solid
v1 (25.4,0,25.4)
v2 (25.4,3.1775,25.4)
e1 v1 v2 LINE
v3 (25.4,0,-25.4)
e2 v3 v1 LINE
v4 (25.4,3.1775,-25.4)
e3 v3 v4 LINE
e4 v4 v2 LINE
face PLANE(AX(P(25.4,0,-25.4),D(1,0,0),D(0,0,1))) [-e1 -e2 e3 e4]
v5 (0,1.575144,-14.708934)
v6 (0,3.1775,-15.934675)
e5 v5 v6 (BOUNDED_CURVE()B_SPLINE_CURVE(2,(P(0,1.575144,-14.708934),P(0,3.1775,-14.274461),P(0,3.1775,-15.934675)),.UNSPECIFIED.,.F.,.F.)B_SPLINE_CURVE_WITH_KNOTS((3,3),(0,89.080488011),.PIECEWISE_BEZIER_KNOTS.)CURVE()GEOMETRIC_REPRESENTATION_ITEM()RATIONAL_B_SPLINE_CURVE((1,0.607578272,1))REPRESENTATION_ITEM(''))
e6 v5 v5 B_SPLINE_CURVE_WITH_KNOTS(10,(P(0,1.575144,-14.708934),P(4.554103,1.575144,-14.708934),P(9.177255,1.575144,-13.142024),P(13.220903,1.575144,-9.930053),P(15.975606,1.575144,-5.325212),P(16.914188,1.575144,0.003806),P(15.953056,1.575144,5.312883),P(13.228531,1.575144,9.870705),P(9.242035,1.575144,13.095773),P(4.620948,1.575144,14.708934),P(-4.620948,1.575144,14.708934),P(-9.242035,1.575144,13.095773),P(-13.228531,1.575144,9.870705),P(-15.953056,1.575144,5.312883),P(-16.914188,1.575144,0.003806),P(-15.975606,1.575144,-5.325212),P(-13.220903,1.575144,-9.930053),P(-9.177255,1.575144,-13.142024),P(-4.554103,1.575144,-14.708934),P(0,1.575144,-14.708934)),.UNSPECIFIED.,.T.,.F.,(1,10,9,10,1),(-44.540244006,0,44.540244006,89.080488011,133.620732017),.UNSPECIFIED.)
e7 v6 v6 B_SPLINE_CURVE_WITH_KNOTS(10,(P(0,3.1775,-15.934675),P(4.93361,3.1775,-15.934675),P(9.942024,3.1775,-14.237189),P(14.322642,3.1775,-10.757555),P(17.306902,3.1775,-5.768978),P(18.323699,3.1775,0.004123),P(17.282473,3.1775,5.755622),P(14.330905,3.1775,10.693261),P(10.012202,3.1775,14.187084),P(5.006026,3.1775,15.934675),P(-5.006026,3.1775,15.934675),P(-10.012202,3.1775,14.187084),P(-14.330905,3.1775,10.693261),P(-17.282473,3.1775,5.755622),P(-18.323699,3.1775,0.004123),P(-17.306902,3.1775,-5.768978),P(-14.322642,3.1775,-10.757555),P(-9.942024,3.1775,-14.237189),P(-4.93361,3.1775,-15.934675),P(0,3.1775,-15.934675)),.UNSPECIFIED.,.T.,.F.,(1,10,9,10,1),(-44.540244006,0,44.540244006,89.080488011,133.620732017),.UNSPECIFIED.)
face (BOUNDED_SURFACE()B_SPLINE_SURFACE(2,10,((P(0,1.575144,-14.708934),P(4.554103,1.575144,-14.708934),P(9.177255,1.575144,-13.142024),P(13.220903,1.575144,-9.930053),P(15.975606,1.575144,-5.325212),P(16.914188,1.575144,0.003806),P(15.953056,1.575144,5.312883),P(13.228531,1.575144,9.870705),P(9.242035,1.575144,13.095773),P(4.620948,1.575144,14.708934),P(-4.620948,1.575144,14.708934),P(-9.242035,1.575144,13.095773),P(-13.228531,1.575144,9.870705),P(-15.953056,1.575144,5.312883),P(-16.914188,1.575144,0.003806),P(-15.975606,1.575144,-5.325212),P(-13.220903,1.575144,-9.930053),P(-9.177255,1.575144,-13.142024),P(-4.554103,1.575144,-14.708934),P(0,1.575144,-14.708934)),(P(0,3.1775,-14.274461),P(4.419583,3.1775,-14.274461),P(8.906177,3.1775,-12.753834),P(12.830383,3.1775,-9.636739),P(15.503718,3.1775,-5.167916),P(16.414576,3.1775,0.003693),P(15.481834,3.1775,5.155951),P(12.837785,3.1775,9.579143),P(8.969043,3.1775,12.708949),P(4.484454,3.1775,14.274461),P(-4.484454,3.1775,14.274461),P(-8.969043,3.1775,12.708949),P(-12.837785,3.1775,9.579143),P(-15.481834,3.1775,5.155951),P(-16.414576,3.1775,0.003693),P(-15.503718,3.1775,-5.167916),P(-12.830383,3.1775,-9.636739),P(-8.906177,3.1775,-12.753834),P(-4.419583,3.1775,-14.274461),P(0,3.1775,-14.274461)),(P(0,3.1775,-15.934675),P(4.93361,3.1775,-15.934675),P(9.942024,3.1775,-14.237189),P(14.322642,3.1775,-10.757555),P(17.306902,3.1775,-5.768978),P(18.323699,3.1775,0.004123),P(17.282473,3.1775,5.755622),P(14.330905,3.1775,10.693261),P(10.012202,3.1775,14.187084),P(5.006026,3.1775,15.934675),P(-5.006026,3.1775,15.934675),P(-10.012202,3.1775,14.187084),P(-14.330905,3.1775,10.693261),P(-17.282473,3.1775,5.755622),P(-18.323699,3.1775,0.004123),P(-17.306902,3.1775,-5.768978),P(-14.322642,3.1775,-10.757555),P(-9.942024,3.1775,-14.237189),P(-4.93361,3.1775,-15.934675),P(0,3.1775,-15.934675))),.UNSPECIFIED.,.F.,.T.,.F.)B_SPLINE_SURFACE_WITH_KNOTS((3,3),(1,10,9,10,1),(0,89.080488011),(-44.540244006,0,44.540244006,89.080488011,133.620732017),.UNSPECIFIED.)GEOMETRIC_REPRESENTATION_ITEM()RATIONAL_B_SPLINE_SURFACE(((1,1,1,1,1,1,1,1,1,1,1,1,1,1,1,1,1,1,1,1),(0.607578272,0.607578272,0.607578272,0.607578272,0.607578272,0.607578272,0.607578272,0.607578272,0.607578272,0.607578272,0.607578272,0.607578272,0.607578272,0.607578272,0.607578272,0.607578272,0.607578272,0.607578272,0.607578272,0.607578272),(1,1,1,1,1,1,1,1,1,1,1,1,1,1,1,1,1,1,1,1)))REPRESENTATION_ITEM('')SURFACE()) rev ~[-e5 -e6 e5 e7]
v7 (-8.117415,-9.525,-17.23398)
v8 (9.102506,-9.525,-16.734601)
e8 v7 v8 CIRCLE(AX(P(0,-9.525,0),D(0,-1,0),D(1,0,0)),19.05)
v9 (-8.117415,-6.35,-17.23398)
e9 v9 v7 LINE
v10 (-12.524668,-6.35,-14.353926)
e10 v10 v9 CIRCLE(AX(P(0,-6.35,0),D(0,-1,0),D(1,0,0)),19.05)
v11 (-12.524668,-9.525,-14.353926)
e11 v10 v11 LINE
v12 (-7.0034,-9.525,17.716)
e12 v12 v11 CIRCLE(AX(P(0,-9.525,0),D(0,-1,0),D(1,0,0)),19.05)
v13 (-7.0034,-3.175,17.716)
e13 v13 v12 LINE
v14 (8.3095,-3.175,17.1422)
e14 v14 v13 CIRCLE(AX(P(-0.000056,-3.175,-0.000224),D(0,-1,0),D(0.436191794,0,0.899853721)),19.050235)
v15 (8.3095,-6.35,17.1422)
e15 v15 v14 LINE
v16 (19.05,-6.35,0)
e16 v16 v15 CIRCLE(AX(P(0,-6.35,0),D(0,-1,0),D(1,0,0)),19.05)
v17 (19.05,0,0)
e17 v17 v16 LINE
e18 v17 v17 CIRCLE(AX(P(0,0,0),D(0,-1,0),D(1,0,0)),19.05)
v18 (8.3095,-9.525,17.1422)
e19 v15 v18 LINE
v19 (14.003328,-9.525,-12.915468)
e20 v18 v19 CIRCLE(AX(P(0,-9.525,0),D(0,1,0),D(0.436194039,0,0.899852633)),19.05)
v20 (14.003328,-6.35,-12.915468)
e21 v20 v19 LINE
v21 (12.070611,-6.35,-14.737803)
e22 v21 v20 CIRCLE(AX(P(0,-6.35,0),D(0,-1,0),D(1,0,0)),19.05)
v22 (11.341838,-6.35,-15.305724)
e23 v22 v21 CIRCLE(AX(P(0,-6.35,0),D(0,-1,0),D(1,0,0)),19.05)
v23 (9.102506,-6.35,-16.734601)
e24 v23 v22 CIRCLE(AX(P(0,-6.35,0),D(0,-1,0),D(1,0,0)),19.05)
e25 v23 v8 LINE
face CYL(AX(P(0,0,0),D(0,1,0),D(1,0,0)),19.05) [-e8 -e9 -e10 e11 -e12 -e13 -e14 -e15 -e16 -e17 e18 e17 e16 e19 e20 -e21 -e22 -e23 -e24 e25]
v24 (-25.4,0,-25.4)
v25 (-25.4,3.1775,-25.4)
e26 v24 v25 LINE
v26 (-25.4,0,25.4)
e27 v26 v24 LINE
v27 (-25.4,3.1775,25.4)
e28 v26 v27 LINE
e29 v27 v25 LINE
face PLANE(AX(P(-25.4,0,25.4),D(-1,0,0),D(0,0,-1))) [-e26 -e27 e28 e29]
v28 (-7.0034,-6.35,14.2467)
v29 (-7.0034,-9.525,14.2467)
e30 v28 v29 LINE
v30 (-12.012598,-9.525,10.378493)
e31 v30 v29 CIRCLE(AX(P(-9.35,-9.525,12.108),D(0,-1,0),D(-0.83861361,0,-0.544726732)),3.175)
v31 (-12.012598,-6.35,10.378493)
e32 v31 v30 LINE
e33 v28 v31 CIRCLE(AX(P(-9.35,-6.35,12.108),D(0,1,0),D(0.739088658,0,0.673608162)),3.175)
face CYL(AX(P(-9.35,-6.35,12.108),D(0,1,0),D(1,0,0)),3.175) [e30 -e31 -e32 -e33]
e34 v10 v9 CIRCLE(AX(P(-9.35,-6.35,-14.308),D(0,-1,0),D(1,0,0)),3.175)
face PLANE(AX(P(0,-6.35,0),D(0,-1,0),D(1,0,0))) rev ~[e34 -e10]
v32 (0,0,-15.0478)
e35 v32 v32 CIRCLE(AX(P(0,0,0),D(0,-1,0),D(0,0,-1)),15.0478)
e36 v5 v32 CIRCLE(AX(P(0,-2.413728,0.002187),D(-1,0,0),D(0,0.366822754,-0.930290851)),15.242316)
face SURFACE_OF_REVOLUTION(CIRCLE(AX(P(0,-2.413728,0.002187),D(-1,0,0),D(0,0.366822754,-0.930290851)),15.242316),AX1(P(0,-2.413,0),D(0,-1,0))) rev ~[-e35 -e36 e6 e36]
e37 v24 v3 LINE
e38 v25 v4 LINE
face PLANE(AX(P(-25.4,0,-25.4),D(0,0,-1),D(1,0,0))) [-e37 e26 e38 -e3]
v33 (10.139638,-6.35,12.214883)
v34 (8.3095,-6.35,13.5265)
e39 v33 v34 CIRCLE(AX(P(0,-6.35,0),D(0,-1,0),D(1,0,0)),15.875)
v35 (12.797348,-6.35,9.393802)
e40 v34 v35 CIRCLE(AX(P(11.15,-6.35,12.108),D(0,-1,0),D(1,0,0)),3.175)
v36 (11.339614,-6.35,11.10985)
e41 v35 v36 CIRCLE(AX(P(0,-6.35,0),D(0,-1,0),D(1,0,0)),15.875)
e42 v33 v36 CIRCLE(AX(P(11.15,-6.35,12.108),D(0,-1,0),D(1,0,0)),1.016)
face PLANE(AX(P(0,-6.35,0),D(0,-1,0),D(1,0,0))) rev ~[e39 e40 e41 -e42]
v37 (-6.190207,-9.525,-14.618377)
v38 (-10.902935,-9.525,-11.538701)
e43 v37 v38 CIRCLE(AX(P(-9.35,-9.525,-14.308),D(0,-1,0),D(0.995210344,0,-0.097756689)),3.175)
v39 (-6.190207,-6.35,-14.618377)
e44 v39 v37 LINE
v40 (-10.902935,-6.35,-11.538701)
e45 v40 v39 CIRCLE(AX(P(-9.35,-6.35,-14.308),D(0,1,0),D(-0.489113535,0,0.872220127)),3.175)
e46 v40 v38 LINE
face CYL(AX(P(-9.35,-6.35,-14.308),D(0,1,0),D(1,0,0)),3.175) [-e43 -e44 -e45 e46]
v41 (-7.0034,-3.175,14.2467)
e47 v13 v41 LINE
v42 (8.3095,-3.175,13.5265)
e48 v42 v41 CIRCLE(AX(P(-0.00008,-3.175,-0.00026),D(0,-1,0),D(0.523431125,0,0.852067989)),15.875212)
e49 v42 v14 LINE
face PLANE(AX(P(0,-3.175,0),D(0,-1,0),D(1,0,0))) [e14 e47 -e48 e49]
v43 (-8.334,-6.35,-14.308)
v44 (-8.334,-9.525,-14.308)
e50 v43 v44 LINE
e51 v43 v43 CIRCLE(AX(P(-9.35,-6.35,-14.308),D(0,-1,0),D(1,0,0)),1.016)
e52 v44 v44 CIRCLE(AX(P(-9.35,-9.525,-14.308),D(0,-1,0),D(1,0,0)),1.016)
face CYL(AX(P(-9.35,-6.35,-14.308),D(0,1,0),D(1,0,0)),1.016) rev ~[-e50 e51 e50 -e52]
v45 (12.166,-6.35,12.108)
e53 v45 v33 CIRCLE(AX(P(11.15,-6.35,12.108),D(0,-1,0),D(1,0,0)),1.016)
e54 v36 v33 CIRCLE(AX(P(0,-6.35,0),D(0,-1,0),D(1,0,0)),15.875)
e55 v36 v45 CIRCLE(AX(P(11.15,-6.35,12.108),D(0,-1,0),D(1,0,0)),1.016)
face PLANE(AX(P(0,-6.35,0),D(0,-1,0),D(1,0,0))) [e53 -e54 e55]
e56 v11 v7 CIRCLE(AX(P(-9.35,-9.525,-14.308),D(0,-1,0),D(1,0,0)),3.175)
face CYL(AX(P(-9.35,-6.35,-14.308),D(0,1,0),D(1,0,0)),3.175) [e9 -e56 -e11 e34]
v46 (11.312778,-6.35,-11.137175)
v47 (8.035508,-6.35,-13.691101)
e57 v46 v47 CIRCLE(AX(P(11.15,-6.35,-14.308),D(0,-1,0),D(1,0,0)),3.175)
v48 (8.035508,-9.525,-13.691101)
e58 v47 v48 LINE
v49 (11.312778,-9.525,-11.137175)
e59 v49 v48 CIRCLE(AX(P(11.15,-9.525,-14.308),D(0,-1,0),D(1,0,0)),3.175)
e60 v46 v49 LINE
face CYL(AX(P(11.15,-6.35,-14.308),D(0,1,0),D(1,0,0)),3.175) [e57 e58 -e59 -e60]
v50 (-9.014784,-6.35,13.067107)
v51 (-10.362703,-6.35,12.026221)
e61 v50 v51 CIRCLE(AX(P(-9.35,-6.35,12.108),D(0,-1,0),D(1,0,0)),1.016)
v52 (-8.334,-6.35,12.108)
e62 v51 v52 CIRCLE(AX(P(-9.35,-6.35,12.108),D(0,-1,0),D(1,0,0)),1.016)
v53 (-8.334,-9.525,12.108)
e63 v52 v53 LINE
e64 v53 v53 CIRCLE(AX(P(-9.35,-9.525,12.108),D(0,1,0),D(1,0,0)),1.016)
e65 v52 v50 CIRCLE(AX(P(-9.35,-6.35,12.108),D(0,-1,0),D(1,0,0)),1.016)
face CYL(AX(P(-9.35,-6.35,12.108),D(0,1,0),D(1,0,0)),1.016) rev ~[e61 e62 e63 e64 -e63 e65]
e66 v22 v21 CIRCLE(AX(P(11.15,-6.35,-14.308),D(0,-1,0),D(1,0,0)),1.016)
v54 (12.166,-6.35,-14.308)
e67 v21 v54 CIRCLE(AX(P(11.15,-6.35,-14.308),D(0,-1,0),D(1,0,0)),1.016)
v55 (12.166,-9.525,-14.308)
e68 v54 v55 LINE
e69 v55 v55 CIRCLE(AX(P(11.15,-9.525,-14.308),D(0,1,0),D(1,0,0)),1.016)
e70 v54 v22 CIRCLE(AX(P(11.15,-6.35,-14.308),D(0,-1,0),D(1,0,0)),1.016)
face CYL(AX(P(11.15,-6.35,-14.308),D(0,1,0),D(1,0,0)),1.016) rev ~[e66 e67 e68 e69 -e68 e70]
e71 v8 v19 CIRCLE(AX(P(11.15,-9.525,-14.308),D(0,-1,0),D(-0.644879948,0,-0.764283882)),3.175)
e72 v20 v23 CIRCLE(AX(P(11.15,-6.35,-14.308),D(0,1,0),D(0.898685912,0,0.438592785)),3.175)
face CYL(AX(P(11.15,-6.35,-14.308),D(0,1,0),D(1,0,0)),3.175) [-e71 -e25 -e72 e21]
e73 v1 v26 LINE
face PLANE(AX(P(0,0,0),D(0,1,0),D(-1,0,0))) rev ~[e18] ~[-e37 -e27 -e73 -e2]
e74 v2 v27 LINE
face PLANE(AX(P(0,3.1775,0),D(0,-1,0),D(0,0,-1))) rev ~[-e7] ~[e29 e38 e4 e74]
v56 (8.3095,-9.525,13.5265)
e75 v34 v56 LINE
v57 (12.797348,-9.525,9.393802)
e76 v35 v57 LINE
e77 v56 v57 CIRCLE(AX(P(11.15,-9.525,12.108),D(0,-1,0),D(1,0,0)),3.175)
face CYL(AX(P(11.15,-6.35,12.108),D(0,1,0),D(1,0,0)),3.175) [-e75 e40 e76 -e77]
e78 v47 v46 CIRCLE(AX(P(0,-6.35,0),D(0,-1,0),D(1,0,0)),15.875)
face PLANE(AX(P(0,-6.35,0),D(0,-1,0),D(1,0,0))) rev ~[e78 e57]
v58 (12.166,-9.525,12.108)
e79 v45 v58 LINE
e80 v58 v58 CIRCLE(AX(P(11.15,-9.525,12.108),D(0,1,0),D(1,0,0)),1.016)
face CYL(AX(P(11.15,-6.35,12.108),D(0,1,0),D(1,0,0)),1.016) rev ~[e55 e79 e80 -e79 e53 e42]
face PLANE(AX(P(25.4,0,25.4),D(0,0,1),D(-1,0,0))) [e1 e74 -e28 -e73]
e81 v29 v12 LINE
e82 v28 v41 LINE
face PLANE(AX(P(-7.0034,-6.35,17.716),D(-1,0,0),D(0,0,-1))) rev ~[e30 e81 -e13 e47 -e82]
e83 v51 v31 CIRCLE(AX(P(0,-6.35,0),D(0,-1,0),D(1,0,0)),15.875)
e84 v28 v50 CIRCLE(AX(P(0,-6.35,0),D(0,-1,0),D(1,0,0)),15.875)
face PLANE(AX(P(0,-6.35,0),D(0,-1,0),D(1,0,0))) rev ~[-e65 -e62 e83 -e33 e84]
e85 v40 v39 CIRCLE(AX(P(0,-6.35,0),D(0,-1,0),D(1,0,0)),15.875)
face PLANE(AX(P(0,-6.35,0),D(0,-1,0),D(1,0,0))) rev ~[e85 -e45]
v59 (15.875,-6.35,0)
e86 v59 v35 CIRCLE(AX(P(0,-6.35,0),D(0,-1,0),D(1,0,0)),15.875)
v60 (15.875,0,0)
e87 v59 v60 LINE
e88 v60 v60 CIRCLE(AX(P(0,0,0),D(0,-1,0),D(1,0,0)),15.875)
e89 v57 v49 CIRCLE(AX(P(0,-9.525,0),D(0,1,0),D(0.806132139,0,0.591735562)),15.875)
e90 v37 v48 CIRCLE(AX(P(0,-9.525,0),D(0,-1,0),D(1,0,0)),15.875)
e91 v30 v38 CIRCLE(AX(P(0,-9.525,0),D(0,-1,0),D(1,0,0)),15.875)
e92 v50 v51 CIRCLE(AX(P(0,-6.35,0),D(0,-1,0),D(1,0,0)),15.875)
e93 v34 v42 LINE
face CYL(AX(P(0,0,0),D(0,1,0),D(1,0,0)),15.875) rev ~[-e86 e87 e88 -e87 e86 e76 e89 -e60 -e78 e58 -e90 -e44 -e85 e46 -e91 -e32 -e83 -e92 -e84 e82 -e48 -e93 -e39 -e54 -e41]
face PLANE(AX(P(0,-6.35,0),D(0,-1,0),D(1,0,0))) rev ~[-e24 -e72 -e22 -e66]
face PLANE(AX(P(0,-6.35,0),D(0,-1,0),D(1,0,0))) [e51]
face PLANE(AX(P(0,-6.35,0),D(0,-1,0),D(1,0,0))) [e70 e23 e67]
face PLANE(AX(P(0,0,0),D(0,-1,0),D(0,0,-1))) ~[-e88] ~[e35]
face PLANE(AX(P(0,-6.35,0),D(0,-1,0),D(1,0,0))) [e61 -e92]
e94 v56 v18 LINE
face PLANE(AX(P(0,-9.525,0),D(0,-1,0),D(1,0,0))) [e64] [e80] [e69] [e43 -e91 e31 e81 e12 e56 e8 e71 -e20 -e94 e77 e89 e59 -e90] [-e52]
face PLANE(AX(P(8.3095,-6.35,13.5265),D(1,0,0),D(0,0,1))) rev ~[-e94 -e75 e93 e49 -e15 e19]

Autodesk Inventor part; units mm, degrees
ref_plane "YZ Plane" through (0, 0, 0) normal (1, 0, 0) x (0, 1, 0)
sketch "Sketch1" plane through (0, 0, 0) normal (0, 1, 0) x (-1, 0, 0)
  line L0 (-25.4, 25.4) -> (25.4, 25.4)
  line L1 (25.4, 25.4) -> (25.4, -25.4)
  line L2 (25.4, -25.4) -> (-25.4, -25.4)
  line L3 (-25.4, -25.4) -> (-25.4, 25.4)
  line L4 (-25.4, 25.4) -> (25.4, -25.4) construction
  line L5 (25.4, 25.4) -> (-25.4, -25.4) construction
  point P0 (0, 0)
  dimension "d0" = 50.8
  dimension "d1" = 50.8
extrude "Extrusion1" add sketch "Sketch1" along normal blind 3.1775
sketch "Sketch2" plane through (0, 0, 0) normal (0, -1, 0) x (1, 0, 0)
  circle A0 centre (0, 0) radius 15.875
  dimension "d4" = 31.75
extrude "Extrusion2" cut sketch "Sketch2" against normal blind 3.1775
sketch "Sketch3" plane through (0, 0, 0) normal (0, -1, 0) x (1, 0, 0)
  circle A0 centre (0, 0) radius 19.05
  circle A1 centre (0, 0) radius 15.875 projected
  dimension "d7" = 38.1
extrude "Extrusion3" add sketch "Sketch3" along normal blind 6.35
sketch "Sketch4" plane through (0, -6.35, 0) normal (0, -1, 0) x (1, 0, 0)
  circle A0 centre (0, 0) radius 19.05 projected
  line L0 (-9.35, 12.108) -> (11.15, 12.108) construction
  line L1 (11.15, 12.108) -> (11.15, -14.308) construction
  line L2 (11.15, -14.308) -> (-9.35, -14.308) construction
  line L3 (-9.35, -14.308) -> (-9.35, 12.108) construction
  circle A1 centre (11.15, -14.308) radius 1.016
  circle A2 centre (11.15, 12.108) radius 1.016
  circle A3 centre (-9.35, 12.108) radius 1.016
  circle A4 centre (-9.35, -14.308) radius 1.016
  circle A5 centre (0, 0) radius 15.875 projected
  circle A6 centre (0, 0) radius 19.05
  circle A7 centre (0, 0) radius 15.875
  circle A8 centre (11.15, -14.308) radius 3.175
  circle A9 centre (-9.35, -14.308) radius 3.175
  circle A10 centre (-9.35, 12.108) radius 3.175
  circle A11 centre (11.15, 12.108) radius 3.175
  line L4 (8.3095, 13.5265) -> (8.3095, 17.1422)
  line L5 (-7.0034, 14.2467) -> (-7.0034, 17.716)
  point P0 (11.15, -1.1)
  point P1 (0.9, 12.108)
  point P2 (14.0033, -12.9155)
  point P3 (-12.5247, -14.3539)
  point P4 (-8.1174, -17.234)
  point P5 (9.1025, -16.7346)
  point P6 (-12.0126, 10.3785)
  point P7 (-7.0034, 14.2467)
  point P8 (8.3095, 13.5265)
  point P9 (12.7973, 9.3938)
  point P10 (11.3128, -11.1372)
  point P11 (8.0355, -13.6911)
  point P12 (-6.1902, -14.6184)
  point P13 (-10.9029, -11.5387)
  dimension "d10" = 20.5
  dimension "d11" = 26.416
  dimension "d15" = 2.032
  dimension "d25" = 6.35
  dimension "d26" = 1.1
  dimension "d35" = 0.9
ref_plane "Work Plane2" through (0, -9.525, 0) normal (0, -1, 0) x (1, 0, 0)
sketch "Sketch5" plane through (0, -9.525, 0) normal (0, -1, 0) x (1, 0, 0)
  circle A0 centre (0, 0) radius 15.875 projected
ref_plane "Work Plane1" through (0, 0, -25.4) normal (-1, 0, 0) x (0, 0, 1)
sketch "Sketch6" plane through (0, 0, -25.4) normal (-1, 0, 0) x (0, 0, 1)
  arc A0 (11.2224, 3.1775) -> (10.3522, 0) centre (25.4, -2.413) ccw
  line L0 (9.525, -6.35) -> (9.525, 3.1775) projected
  line L1 (9.525, 3.1775) -> (41.275, 3.1775) projected
  line L2 (44.45, 0) -> (6.35, 0) projected
  line L3 (11.2224, 3.1775) -> (9.525, 3.1775)
  line L4 (9.525, 3.1775) -> (9.525, 0)
  line L5 (9.525, 0) -> (10.3522, 0)
  line L6 (9.525, -9.525) -> (41.275, -9.525) projected
  line L7 (25.4, -2.413) -> (25.4, -9.525)
  point P0 (25.4, 0)
  point P1 (25.4, -5.969)
  dimension "d21" = 30.48
  dimension "d29" = 7.112
revolve "Revolution1" add sketch "Sketch6" angle 360 about axis through (0, -2.413, 0) along (0, -1, 0)
fillet "Fillet1" radius 1.27 1 edges at (0, 3.1775, 14.1776)
extrude "Extrusion7" add sketch "Sketch4" along normal blind 3.175 contours A0 A11 L4 | L5 A10 A5 A9 A0 | A0 A11 A5 A2 | A5 A2 A11 | A9 A5 A0 | A0 A9 | A10 A5 A3 | A5 A3 A10 | A0 A8 A5 A11 | A9 A5 A8 A0 | A9 A5 | A8 A5 A0 A1 | A0 A1 A8 | A5 A8
sketch "Sketch7" plane through (0, -6.35, 0) normal (0, -1, 0) x (1, 0, 0)
  line L0 (-7.0034, 17.716) -> (-7.0034, 14.2467) projected
  arc A0 (8.3095, 13.5265) -> (-7.0034, 14.2467) centre (0, 0) ccw projected
  line L1 (8.3095, 13.5265) -> (8.3095, 17.1422) projected
  arc A1 (8.3095, 17.1422) -> (-7.0034, 17.716) centre (0, 0) ccw projected
extrude "Extrusion8" cut sketch "Sketch7" against normal blind 3.175
properties part number "JoystickInsert"
